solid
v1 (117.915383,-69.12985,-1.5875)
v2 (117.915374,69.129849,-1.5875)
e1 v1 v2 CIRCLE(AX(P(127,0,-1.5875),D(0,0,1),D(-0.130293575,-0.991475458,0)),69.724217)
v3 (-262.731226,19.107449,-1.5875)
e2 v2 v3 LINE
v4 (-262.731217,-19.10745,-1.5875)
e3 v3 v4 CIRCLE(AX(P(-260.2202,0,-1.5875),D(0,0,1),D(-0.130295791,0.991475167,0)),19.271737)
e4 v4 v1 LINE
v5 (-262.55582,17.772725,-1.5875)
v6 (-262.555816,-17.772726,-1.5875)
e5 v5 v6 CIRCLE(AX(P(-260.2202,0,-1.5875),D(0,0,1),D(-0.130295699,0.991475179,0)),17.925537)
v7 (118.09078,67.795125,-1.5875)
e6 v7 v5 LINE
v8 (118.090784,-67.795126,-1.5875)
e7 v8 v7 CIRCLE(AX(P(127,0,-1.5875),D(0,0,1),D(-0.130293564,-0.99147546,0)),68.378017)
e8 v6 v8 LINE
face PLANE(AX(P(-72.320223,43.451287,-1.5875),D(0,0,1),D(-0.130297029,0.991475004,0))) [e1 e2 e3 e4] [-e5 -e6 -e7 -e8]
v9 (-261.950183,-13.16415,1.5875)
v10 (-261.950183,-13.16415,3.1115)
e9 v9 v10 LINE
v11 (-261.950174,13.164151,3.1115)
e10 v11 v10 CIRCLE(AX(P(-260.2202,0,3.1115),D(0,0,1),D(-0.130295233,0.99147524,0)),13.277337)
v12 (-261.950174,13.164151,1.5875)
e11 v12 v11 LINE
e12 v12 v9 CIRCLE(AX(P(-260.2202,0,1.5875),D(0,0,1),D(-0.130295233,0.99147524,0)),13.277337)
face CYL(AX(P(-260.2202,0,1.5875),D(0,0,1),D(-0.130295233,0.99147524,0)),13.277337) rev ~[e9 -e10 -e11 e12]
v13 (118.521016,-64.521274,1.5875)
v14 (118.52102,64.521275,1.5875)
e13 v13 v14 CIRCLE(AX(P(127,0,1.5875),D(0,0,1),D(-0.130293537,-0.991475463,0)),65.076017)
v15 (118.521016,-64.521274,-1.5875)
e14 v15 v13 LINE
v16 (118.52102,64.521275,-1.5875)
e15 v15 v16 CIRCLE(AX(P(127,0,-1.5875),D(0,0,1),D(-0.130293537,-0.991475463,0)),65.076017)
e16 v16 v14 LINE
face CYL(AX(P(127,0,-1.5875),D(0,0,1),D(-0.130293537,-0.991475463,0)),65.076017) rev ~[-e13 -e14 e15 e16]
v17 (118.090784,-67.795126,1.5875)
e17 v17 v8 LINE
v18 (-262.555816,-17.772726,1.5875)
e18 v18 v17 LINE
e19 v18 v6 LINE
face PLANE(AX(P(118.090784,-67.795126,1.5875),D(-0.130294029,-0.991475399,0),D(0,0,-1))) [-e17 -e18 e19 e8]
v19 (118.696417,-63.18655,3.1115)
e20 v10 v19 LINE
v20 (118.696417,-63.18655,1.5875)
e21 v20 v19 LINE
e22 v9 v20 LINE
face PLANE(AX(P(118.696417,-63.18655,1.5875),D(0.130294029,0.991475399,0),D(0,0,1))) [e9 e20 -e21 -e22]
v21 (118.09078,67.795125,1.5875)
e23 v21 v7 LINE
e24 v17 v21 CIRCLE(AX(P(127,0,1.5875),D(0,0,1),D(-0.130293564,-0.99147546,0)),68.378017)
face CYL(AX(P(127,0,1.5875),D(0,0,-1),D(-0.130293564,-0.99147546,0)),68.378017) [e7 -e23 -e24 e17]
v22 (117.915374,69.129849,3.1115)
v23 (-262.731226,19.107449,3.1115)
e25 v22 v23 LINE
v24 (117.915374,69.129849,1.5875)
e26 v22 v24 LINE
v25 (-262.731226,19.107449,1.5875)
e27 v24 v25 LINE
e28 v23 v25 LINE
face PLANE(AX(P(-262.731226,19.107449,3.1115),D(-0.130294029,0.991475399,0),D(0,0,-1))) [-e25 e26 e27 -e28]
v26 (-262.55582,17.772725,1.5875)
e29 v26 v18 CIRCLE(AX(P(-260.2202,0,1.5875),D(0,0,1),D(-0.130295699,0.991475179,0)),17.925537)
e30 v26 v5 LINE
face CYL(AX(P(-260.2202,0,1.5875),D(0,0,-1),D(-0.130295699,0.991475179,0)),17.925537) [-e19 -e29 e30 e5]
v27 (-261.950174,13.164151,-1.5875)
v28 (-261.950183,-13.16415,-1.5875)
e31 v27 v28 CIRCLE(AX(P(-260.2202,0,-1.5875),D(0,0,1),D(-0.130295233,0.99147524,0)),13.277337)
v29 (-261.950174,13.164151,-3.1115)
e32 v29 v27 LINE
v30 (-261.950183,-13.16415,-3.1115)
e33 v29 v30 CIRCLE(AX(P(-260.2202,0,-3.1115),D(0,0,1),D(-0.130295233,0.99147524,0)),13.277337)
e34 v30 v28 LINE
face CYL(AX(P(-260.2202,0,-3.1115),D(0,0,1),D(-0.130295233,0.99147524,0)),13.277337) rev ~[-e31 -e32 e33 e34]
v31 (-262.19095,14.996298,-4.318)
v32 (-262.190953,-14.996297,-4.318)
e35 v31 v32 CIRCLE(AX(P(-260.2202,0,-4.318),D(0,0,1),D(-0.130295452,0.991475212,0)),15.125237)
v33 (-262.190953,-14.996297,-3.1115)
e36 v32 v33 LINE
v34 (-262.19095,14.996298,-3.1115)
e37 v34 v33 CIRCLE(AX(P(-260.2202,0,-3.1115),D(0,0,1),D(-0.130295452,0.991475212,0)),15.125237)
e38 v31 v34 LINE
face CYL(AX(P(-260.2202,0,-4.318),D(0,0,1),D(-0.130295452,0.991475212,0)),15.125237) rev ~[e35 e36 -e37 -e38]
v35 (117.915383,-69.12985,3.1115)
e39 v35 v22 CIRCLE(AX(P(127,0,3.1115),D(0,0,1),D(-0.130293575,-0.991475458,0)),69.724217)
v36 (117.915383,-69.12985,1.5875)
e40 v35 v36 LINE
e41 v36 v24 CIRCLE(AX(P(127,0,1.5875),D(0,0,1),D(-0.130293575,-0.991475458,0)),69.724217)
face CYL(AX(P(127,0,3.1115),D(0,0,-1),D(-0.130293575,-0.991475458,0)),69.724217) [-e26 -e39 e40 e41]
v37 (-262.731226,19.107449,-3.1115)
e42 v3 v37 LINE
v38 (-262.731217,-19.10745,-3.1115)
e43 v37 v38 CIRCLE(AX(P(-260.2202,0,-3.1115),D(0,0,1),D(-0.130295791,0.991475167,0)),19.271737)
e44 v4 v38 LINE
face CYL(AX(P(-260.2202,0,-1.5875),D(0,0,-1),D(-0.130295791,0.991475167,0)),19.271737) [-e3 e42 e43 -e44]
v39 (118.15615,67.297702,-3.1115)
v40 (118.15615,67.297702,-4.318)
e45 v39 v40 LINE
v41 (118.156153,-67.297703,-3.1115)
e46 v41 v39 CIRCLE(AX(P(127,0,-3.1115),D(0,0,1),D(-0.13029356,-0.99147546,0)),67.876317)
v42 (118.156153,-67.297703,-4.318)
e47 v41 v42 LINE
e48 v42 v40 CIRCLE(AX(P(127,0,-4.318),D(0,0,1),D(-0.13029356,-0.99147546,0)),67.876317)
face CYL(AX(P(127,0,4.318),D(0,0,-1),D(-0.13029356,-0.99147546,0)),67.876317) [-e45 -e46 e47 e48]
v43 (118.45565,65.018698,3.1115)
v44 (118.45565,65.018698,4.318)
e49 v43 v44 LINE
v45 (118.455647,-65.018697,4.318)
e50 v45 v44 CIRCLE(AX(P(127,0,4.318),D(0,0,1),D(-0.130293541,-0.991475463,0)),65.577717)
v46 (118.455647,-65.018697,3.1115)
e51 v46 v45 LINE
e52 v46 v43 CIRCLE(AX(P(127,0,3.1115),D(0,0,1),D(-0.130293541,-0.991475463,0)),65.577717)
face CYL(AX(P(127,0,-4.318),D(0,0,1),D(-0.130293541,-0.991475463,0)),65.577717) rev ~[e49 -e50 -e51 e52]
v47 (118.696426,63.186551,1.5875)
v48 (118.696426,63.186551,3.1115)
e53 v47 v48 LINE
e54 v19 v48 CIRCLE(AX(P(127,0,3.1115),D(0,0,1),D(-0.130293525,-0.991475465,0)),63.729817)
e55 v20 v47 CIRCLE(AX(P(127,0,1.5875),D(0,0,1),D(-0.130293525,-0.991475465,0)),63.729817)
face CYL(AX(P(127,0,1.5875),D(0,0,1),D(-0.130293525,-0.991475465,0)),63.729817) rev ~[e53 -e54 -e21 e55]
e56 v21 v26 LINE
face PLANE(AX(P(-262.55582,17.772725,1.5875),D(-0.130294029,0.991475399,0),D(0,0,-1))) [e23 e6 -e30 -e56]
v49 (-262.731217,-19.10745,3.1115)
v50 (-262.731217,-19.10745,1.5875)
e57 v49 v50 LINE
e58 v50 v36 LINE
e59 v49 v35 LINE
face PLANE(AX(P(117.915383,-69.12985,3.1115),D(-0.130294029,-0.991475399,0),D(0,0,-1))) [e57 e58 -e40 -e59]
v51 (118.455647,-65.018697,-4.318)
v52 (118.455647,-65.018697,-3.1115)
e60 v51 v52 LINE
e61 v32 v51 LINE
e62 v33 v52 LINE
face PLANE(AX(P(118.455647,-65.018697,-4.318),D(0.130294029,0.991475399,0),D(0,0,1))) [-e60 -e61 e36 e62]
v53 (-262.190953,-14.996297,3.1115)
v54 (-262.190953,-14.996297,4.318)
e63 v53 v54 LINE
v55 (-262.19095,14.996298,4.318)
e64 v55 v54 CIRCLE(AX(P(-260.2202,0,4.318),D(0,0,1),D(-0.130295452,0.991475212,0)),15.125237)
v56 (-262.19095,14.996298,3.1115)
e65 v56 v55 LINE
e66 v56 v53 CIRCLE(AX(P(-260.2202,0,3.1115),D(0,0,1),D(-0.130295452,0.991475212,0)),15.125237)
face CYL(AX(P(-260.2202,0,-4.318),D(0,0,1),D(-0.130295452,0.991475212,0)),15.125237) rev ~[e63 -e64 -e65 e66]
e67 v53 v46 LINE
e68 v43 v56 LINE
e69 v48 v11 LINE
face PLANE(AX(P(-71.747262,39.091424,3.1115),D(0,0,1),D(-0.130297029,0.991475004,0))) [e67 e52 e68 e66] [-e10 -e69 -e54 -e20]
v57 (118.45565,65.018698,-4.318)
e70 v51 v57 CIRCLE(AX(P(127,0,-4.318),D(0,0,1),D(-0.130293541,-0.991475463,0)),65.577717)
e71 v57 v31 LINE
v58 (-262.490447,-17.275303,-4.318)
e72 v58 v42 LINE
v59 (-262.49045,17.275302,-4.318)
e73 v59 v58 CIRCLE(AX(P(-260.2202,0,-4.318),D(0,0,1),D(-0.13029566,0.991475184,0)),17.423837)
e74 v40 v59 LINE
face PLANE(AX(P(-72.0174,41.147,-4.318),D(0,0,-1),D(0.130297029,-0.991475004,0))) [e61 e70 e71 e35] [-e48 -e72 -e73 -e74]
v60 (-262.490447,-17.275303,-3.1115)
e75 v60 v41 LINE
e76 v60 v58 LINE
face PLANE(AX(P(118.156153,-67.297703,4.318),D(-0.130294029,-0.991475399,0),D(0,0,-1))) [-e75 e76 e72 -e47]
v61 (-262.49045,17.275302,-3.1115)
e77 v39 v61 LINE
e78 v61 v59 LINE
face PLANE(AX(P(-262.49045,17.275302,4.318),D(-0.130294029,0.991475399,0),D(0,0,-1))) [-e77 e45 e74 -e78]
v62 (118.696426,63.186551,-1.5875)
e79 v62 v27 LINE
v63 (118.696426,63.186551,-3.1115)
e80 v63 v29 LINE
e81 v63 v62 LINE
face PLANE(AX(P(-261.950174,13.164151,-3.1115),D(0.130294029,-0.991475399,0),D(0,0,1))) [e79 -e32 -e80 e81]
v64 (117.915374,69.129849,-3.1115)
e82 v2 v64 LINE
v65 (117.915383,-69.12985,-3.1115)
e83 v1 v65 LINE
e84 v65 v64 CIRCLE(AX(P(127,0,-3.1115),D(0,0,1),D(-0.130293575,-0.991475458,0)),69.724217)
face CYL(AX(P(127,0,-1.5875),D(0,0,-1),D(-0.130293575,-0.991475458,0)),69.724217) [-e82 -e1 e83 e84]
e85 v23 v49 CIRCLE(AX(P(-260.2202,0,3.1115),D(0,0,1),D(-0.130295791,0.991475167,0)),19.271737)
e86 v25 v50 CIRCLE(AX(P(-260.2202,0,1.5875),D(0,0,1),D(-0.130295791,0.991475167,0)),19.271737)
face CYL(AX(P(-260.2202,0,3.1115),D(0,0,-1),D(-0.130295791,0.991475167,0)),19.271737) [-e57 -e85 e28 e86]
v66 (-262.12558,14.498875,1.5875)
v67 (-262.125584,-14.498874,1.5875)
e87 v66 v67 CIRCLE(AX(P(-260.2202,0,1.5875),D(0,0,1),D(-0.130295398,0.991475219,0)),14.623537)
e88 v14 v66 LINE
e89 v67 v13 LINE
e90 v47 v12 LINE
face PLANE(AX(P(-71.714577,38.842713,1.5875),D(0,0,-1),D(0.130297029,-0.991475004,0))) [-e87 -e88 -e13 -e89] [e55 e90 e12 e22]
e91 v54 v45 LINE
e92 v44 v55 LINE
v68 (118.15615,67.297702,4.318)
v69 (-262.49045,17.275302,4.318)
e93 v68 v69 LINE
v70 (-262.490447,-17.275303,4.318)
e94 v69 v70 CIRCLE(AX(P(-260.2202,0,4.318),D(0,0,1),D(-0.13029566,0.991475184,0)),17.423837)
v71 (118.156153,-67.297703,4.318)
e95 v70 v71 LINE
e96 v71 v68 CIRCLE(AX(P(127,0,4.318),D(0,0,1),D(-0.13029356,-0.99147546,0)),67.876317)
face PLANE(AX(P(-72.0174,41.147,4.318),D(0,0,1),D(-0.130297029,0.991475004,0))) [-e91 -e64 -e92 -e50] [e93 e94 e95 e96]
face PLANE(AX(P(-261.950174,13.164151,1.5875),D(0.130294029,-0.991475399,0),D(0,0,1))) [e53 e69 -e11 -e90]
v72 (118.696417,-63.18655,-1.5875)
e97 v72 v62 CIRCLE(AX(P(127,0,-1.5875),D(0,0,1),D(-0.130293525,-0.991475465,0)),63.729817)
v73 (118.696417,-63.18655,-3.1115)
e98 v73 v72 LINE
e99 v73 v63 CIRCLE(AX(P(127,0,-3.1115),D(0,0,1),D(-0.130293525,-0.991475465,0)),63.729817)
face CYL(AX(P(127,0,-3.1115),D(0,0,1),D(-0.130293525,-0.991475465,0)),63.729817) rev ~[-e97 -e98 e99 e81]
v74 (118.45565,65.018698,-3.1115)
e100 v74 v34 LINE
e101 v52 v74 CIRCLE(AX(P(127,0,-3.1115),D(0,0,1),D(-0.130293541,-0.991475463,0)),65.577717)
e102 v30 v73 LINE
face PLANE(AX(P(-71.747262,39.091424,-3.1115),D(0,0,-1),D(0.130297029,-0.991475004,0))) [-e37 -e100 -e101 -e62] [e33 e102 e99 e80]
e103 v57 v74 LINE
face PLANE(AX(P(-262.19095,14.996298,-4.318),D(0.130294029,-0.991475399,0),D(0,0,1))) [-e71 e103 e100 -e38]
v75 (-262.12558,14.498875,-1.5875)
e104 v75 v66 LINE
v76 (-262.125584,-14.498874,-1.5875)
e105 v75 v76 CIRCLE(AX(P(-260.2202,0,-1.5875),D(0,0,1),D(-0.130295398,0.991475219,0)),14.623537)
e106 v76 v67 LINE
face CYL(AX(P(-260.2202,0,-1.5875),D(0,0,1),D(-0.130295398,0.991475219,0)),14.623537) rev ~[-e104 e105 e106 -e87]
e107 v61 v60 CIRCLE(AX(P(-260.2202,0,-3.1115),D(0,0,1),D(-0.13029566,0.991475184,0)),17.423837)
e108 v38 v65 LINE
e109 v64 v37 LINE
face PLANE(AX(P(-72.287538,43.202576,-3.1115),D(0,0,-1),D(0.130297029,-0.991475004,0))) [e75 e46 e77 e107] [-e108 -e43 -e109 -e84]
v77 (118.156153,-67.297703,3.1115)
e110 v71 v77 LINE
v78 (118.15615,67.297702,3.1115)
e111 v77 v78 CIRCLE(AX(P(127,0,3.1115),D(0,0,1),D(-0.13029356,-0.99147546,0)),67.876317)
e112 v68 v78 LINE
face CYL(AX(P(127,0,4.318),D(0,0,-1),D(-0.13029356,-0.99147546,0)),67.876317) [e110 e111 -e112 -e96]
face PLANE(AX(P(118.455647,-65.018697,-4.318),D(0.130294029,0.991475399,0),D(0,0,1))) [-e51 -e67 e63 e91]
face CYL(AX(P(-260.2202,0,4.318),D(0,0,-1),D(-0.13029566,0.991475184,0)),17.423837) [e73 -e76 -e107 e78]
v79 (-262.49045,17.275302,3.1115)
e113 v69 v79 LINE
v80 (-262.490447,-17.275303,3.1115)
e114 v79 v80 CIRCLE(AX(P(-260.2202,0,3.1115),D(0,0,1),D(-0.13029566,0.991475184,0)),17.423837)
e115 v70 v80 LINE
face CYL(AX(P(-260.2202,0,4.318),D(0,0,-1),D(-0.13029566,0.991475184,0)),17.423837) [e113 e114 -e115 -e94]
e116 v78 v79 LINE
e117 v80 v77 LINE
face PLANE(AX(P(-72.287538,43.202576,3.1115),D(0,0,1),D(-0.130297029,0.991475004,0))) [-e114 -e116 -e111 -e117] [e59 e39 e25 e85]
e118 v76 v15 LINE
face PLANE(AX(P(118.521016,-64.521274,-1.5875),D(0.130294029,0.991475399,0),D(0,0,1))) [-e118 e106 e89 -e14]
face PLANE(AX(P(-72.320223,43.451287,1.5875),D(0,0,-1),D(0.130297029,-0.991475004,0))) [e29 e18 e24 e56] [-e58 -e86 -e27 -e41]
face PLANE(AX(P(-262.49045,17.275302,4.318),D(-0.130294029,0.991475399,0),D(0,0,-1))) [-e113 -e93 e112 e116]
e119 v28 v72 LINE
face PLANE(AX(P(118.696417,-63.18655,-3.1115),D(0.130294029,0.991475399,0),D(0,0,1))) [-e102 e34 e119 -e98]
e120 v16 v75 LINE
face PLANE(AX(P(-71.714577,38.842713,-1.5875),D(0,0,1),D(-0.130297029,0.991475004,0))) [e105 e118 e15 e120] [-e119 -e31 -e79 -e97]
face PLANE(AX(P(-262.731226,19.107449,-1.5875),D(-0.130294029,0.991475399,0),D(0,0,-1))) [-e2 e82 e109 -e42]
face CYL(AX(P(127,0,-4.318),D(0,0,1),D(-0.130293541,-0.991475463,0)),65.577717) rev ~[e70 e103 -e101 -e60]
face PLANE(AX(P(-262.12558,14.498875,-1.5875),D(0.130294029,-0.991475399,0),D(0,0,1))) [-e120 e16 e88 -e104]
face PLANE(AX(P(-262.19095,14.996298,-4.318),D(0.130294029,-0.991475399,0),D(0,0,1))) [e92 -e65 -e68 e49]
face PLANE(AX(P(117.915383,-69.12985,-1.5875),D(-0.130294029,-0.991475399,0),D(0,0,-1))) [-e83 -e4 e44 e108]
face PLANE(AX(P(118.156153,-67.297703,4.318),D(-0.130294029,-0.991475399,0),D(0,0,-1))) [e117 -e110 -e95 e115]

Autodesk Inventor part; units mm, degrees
ref_plane "Work Plane2" through (-260.2202, 0, 0) normal (-1, 0, 0) x (0, 0, 1)
ref_plane "Work Plane3" through (127, 0, 0) normal (-0.9988673, -0.0475819, 0) x (0, 0, 1)
sketch "Path" plane through (0, 0, 0) normal (0, 0, 1) x (1, 0, 0)
  arc A0 (-262.3407, 16.1358) -> (-262.3407, -16.1358) centre (-260.2202, 0) ccw
  arc A1 (118.3059, -66.1582) -> (118.3059, 66.1582) centre (127, 0) ccw
  line L0 (118.3059, -66.1582) -> (-262.3407, -16.1358)
  line L1 (-262.3407, 16.1358) -> (118.3059, 66.1582)
ref_plane "Section Plane" through (-262.3407, -16.1358, 0) normal (0.9914754, -0.1302941, 0) x (0, 0, 1)
sketch "Section Sketch" plane through (-262.3407, -16.1358, 0) normal (0.9914754, -0.1302941, 0) x (0, 0, 1)
  line L0 (-4.318, -1.1493) -> (4.318, -1.1493)
  line L1 (4.318, -1.1493) -> (4.318, 1.1493)
  line L2 (4.318, 1.1493) -> (-4.318, 1.1493)
  line L3 (-4.318, 1.1493) -> (-4.318, -1.1493)
  line L4 (-1.5875, -1.651) -> (1.5875, -1.651)
  line L5 (1.5875, -1.651) -> (1.5875, 1.651)
  line L6 (1.5875, 1.651) -> (-1.5875, 1.651)
  line L7 (-1.5875, 1.651) -> (-1.5875, -1.651)
  line L8 (-1.5875, 0) -> (1.5875, 0) construction
  line L9 (-3.1115, -2.9972) -> (-1.5875, -2.9972)
  line L10 (-1.5875, -2.9972) -> (-1.5875, 2.9972)
  line L11 (-1.5875, 2.9972) -> (-3.1115, 2.9972)
  line L12 (-3.1115, 2.9972) -> (-3.1115, -2.9972)
  line L13 (1.5875, -2.9972) -> (3.1115, -2.9972)
  line L14 (3.1115, -2.9972) -> (3.1115, 2.9972)
  line L15 (3.1115, 2.9972) -> (1.5875, 2.9972)
  line L16 (1.5875, 2.9972) -> (1.5875, -2.9972)
  line L17 (-4.318, 0) -> (4.318, 0) construction
  point P0 (0, 0)
  point P1 (0, 0)
  dimension "d21" = 2.2987
  dimension "d22" = 3.302
  dimension "d23" = 3.175
  dimension "d24" = 1.524
  dimension "d31" = 5.9944
  dimension "d32" = 8.636
sweep "Solid" add profiles "Section Sketch" path "Path"
pattern_of_one "Strand Pattern"
equation "\"d21\" = da_d2"
equation "\"d22\" = da_d1"
equation "\"d23\" = da_b1"
equation "\"d24\" = da_t1 + da_t2"
equation "\"d30\" = da_pt"
equation "\"da_p\" = 6.35"
equation "\"da_b1\" = 3.175"
equation "\"da_h2\" = 5.9944"
equation "\"da_h3\" = 5.207"
equation "\"da_d1\" = 3.302"
equation "\"da_d2\" = 2.2987"
equation "\"da_pt\" = 6.4008"
equation "\"da_b\" = 8.636"
equation "\"da_t1\" = 0.762"
equation "\"da_t2\" = 0.762"
properties part number "Roller Chain"
